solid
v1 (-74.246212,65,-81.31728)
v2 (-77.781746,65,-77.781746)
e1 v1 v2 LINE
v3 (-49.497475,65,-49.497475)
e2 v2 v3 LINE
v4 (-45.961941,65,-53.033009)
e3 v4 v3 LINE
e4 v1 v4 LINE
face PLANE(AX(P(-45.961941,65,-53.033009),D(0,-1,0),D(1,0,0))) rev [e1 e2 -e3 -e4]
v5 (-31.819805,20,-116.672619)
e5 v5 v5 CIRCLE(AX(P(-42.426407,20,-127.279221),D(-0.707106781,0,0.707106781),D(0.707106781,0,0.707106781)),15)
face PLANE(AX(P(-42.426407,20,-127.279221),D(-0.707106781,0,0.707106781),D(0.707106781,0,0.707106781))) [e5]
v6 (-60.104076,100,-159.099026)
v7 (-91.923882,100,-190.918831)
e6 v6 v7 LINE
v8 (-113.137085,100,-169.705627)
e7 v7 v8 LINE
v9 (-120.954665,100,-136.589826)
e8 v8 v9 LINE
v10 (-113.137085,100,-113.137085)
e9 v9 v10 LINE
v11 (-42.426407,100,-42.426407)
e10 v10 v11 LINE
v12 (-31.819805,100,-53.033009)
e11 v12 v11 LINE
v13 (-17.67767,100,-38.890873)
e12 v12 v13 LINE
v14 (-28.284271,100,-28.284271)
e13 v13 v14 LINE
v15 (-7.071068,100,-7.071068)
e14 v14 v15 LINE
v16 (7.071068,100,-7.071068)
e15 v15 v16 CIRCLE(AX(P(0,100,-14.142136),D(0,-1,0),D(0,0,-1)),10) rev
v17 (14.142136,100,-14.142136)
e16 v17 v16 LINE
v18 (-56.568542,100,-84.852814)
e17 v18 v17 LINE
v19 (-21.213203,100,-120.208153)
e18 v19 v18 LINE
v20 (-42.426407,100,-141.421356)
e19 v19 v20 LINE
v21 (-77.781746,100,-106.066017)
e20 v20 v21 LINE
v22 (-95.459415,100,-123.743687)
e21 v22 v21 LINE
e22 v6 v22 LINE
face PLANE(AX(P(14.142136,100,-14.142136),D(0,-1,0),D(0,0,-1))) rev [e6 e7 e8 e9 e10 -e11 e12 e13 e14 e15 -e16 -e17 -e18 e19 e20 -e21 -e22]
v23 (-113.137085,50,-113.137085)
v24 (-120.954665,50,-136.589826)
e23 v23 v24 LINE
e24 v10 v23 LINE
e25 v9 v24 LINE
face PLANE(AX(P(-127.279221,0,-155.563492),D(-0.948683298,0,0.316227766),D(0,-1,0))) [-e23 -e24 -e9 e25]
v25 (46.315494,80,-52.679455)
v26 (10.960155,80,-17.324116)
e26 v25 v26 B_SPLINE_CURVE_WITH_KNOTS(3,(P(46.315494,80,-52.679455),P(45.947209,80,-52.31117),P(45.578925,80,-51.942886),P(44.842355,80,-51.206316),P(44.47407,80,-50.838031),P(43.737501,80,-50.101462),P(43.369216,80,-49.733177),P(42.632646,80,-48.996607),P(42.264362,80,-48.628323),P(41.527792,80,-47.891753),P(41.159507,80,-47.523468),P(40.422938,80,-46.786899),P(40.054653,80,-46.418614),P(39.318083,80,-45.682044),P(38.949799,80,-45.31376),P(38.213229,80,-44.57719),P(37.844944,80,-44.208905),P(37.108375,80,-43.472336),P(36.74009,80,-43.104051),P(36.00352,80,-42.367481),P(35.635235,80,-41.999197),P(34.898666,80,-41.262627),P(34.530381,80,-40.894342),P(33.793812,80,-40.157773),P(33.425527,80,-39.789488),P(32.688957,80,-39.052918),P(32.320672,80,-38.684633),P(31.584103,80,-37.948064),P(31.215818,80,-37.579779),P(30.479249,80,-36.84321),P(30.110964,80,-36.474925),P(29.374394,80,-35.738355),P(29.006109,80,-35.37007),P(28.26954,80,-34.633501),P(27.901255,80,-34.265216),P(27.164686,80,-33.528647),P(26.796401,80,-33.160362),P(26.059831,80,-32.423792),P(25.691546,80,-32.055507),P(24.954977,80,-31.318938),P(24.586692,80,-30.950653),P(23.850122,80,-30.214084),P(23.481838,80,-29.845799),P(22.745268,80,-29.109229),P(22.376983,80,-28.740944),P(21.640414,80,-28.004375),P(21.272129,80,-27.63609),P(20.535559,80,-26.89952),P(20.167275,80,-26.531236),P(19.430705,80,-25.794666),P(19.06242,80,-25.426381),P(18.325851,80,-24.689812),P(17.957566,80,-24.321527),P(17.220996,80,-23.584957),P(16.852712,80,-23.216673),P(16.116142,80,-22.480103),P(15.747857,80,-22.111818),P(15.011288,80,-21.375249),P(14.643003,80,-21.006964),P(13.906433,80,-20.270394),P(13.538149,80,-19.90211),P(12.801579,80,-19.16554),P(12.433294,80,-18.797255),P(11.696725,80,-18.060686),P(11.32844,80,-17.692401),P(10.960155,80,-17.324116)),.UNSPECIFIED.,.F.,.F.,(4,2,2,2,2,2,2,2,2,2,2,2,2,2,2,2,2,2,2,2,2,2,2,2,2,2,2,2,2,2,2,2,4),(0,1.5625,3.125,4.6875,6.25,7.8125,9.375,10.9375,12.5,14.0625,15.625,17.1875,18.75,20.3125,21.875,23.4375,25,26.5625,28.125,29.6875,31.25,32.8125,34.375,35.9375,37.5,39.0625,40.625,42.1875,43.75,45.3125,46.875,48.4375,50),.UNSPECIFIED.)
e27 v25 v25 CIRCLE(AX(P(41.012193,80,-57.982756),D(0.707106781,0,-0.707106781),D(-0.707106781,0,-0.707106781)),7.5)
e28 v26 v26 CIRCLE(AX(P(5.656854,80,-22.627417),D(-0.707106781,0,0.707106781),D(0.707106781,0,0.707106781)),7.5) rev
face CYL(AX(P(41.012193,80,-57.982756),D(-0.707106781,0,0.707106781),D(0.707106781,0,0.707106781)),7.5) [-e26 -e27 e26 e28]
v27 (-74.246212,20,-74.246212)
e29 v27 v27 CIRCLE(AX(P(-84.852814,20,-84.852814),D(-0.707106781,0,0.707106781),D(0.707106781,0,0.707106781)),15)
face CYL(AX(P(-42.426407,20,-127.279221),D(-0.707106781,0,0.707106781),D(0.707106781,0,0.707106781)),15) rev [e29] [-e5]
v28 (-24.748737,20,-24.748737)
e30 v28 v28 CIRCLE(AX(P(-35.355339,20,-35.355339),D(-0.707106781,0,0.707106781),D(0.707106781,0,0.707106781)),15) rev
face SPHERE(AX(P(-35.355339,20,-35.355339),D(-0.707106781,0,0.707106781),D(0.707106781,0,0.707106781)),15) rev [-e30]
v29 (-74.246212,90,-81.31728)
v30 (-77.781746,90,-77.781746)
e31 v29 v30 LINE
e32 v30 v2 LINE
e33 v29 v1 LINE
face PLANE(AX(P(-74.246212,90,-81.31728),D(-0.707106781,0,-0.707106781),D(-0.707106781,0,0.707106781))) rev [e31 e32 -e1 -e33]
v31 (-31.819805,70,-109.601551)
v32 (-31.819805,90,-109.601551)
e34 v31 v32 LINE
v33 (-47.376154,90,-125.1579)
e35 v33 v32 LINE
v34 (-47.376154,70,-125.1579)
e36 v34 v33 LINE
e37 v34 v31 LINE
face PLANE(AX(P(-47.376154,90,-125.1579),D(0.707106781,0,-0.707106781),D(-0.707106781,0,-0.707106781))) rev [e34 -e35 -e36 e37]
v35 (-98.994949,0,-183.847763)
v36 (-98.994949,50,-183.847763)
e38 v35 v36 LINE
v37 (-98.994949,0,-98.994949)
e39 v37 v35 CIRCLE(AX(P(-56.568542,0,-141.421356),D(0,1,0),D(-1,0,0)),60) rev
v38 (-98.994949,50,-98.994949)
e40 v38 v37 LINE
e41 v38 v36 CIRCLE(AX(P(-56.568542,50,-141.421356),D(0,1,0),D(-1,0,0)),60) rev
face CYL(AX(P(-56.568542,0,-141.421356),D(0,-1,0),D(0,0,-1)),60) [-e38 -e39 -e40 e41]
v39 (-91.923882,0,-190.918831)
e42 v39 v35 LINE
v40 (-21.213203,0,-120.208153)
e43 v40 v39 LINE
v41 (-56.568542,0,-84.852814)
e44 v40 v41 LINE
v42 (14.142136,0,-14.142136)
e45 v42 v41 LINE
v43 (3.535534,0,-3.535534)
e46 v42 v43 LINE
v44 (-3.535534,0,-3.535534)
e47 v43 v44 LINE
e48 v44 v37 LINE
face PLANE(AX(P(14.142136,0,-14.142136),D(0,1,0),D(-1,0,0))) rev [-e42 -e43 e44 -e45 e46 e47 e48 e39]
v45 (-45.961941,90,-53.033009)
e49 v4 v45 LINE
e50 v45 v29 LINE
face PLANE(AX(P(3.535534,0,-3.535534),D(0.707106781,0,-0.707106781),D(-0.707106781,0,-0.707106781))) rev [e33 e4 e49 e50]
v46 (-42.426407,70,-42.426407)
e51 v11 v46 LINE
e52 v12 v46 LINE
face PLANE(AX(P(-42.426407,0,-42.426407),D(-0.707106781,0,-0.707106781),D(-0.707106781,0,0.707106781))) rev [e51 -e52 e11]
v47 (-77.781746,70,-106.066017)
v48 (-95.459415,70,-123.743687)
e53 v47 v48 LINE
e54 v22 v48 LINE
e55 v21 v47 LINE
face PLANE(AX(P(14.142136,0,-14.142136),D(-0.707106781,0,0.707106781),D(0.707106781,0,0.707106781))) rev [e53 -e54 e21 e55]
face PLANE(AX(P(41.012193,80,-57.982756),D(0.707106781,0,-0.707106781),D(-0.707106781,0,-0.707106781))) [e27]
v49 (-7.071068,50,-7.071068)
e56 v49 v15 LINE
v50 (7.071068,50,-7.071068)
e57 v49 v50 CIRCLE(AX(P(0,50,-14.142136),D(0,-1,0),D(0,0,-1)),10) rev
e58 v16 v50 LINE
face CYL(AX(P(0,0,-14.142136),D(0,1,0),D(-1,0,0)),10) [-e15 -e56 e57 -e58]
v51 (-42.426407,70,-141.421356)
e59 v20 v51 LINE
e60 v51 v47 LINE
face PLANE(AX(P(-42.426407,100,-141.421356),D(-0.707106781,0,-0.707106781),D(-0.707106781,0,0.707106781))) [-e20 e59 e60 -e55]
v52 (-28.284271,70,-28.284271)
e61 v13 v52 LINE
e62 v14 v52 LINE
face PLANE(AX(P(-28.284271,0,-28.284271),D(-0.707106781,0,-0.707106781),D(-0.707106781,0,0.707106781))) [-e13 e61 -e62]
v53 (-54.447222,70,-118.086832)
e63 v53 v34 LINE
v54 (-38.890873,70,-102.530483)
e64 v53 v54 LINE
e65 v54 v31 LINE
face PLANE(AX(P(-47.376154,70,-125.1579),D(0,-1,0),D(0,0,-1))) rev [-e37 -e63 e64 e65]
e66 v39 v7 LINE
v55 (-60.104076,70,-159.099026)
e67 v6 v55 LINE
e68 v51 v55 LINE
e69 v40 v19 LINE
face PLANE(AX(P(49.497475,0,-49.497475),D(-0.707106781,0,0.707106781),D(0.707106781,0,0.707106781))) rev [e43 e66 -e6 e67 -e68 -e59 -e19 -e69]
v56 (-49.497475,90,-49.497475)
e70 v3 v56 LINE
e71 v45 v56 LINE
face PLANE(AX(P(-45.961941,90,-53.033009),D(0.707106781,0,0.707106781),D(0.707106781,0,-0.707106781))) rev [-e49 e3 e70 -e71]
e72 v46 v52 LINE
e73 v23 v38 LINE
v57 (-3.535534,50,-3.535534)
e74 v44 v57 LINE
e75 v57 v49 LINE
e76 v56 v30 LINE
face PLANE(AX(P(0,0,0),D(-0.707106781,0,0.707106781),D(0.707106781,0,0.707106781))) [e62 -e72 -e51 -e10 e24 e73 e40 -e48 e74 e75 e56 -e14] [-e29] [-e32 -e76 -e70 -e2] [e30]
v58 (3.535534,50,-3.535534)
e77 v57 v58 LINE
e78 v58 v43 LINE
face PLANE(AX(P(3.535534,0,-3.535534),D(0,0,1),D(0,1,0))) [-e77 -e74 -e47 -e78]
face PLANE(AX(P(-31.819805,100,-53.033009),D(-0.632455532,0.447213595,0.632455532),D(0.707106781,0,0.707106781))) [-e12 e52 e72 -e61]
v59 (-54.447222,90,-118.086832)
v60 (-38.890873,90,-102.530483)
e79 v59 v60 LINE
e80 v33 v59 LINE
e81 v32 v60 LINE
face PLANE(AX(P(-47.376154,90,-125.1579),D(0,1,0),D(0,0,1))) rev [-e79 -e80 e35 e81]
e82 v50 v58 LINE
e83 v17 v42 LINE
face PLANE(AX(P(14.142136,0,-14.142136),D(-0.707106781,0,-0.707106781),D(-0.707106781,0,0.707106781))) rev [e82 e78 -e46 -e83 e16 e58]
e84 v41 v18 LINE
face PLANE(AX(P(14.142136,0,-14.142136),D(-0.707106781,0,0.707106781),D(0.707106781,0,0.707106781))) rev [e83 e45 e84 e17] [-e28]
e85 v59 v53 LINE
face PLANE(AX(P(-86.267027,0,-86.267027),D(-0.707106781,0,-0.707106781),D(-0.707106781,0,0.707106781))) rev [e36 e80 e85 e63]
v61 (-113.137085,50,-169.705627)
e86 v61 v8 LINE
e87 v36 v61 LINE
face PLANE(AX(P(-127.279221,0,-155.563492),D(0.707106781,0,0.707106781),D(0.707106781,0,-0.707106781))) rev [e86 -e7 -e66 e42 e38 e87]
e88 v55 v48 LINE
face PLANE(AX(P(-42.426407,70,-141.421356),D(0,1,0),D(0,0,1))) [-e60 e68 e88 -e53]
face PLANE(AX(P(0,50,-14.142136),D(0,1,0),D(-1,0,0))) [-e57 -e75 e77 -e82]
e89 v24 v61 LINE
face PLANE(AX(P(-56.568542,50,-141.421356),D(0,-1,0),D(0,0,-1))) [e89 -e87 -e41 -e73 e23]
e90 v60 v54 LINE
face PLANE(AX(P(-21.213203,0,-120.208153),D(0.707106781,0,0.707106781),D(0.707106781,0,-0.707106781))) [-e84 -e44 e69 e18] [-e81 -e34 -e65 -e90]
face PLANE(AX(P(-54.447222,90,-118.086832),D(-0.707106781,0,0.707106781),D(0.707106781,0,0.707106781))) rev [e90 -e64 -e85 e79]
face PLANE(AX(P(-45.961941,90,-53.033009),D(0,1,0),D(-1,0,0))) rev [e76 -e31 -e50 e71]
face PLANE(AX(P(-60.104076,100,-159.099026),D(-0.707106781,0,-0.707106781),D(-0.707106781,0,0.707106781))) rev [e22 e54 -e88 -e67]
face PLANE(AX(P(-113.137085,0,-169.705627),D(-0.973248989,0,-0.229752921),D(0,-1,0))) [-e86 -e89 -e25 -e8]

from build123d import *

# Parameters (mm, degrees)
SKICA1_W                 = 200
SKICA1_H                 = 100
P_IDAT_VYSUNUT_M1_DEPTH  = 20
P_IDAT_VYSUNUT_M2_DEPTH  = 50
SKICA7_R                 = 7.5
P_IDAT_VYSUNUT_M3_DEPTH  = 50
ODEBRAT_VYSUNUT_M3_DEPTH = 10
ZAOBLIT1_START           = 50
ZAOBLIT1_DEPTH           = 51
SKICA9_W                 = 40
SKICA9_H                 = 25
ODEBRAT_VYSUNUT_M4_DEPTH = 5
CHAMFER2_SIZE            = 5
FILLET2_DEPTH            = 50
CHAMFER3_SIZE            = 40
CHAMFER3_SIZE2           = 20
CHAMFER4_SIZE            = 20
SKETCH3_R                = 15
CUT_EXTRUDE2_DEPTH       = 60
SKETCH4_W                = 10
SKETCH4_H                = 20
CUT_EXTRUDE3_DEPTH       = 22


with BuildPart() as part:
    # Skica1 → Přidat vysunutím1 (new body)
    with BuildSketch(Plane(origin=(0, 0, 0), x_dir=(-0.7071067811865476, 0, -0.7071067811865476), z_dir=(0.7071067811865476, 0, -0.7071067811865476))):
        with Locations((100, 50)):
            Rectangle(SKICA1_W, SKICA1_H)
    extrude(amount=P_IDAT_VYSUNUT_M1_DEPTH)

    # Skica2 → Přidat vysunutím2 (add)
    with BuildSketch(Plane(origin=(14.142135624, 0, -14.142135624), x_dir=(-0.7071067811865478, 0, -0.7071067811865472), z_dir=(0.7071067811865472, 0, -0.7071067811865478))):
        Polygon((100, 0), (200, 0), (200, 100), (155, 100), (155, 70), (130, 70), (130, 100), (100, 100), align=None)
    extrude(amount=P_IDAT_VYSUNUT_M2_DEPTH)

    # Skica7 → Přidat vysunutím3 (add)
    with BuildSketch(Plane(origin=(14.142135624, 0, -14.142135624), x_dir=(-0.7071067811865478, 0, -0.7071067811865472), z_dir=(0.7071067811865472, 0, -0.7071067811865478))):
        with Locations(Location((12, 80, 0), (0, 0, 180))):
            Circle(SKICA7_R)
    extrude(amount=P_IDAT_VYSUNUT_M3_DEPTH)

    # Skica8 → Odebrat vysunutím3 (cut, symmetric)
    with BuildSketch(Plane(origin=(-35.355339059, 0, -35.355339059), x_dir=(0.7071067811865476, 0, -0.7071067811865475), z_dir=(0.7071067811865475, 0, 0.7071067811865476))):
        Polygon((0, 100), (0, 70), (15, 100), align=None)
    extrude(amount=ODEBRAT_VYSUNUT_M3_DEPTH, both=True, mode=Mode.SUBTRACT)

    # Zaoblit1: read off the stored shape, not the designer's step
    # Zaoblit1 outline → Zaoblit1 (cut)
    with BuildSketch(Plane(origin=(0, 0, 0), x_dir=(1, 0, 0), z_dir=(0, 1, 0)).offset(ZAOBLIT1_START)):
        with BuildLine():
            ThreePointArc((7.071067812, 7.071067812), (0, 4.142135624), (-7.071067812, 7.071067812))
            Line((-7.071067812, 7.071067812), (0, 0))
            Line((0, 0), (7.071067812, 7.071067812))
        make_face()
    extrude(amount=ZAOBLIT1_DEPTH, mode=Mode.SUBTRACT)

    # Skica9 → Odebrat vysunutím4 (cut)
    with BuildSketch(Plane(origin=(0, 0, 0), x_dir=(0.7071067811865478, 0, 0.7071067811865472), z_dir=(-0.7071067811865472, 0, 0.7071067811865478))):
        with Locations((-90, 77.5)):
            Rectangle(SKICA9_W, SKICA9_H)
    extrude(amount=-ODEBRAT_VYSUNUT_M4_DEPTH, mode=Mode.SUBTRACT)

    # Chamfer2
    chamfer2_edges = [part.edges().sort_by_distance(p)[0] for p in [
        (0, 25, 0),
    ]]
    chamfer(chamfer2_edges, length=CHAMFER2_SIZE)

    # Fillet2: read off the stored shape, not the designer's step
    # Fillet2 outline → Fillet2 (cut)
    with BuildSketch(Plane(origin=(0, 0, 0), x_dir=(1, 0, 0), z_dir=(0, 1, 0))):
        with BuildLine():
            Line((-141.421356237, 141.421356237), (-98.994949366, 98.994949366))
            ThreePointArc((-98.994949366, 98.994949366), (-116.568542495, 141.421356238), (-98.994949366, 183.847763109))
            Line((-98.994949366, 183.847763109), (-141.421356237, 141.421356237))
        make_face()
    extrude(amount=FILLET2_DEPTH, mode=Mode.SUBTRACT)

    # Chamfer3
    chamfer3_edges = [part.edges().sort_by_distance(p)[0] for p in [
        (-141.421356237, 75, -141.421356237),
    ]]
    chamfer3_side = [part.faces().sort_by_distance(p)[0] for p in [
        (-65.974510685, 51.38225256, -65.974510685),
    ]]
    chamfer(chamfer3_edges, length=CHAMFER3_SIZE, length2=CHAMFER3_SIZE2, reference=chamfer3_side[0])

    # Chamfer4
    chamfer4_edges = [part.edges().sort_by_distance(p)[0] for p in [
        (-127.279220614, 75, -155.563491861),
    ]]
    chamfer(chamfer4_edges, length=CHAMFER4_SIZE)

    # Sketch2 → Cut-Revolve4 (revolve, cut)
    with BuildSketch(Plane(origin=(0, 0, 0), x_dir=(0.7071067811865478, 0, 0.7071067811865472), z_dir=(-0.7071067811865472, 0, 0.7071067811865478))):
        with BuildLine():
            Line((-50, 35), (-50, 5))
            ThreePointArc((-50, 5), (-35, 20), (-50, 35))
        make_face()
    revolve(axis=Axis((-35.355339059, 35, -35.355339059), (0, -1, 0)), mode=Mode.SUBTRACT)

    # Sketch3 → Cut-Extrude2 (cut)
    with BuildSketch(Plane(origin=(0, 0, 0), x_dir=(0.7071067811865478, 0, 0.7071067811865472), z_dir=(-0.7071067811865472, 0, 0.7071067811865478))):
        with Locations((-120, 20)):
            Circle(SKETCH3_R)
    extrude(amount=-CUT_EXTRUDE2_DEPTH, mode=Mode.SUBTRACT)

    # Sketch4 → Cut-Extrude3 (cut)
    with BuildSketch(Plane(origin=(-70.710678119, 0, -70.710678119), x_dir=(0.7071067811865472, 0, -0.7071067811865478), z_dir=(0.7071067811865478, 0, 0.7071067811865472))):
        with Locations((50, 80)):
            Rectangle(SKETCH4_W, SKETCH4_H)
    extrude(amount=-CUT_EXTRUDE3_DEPTH, mode=Mode.SUBTRACT)


solid = part.part
